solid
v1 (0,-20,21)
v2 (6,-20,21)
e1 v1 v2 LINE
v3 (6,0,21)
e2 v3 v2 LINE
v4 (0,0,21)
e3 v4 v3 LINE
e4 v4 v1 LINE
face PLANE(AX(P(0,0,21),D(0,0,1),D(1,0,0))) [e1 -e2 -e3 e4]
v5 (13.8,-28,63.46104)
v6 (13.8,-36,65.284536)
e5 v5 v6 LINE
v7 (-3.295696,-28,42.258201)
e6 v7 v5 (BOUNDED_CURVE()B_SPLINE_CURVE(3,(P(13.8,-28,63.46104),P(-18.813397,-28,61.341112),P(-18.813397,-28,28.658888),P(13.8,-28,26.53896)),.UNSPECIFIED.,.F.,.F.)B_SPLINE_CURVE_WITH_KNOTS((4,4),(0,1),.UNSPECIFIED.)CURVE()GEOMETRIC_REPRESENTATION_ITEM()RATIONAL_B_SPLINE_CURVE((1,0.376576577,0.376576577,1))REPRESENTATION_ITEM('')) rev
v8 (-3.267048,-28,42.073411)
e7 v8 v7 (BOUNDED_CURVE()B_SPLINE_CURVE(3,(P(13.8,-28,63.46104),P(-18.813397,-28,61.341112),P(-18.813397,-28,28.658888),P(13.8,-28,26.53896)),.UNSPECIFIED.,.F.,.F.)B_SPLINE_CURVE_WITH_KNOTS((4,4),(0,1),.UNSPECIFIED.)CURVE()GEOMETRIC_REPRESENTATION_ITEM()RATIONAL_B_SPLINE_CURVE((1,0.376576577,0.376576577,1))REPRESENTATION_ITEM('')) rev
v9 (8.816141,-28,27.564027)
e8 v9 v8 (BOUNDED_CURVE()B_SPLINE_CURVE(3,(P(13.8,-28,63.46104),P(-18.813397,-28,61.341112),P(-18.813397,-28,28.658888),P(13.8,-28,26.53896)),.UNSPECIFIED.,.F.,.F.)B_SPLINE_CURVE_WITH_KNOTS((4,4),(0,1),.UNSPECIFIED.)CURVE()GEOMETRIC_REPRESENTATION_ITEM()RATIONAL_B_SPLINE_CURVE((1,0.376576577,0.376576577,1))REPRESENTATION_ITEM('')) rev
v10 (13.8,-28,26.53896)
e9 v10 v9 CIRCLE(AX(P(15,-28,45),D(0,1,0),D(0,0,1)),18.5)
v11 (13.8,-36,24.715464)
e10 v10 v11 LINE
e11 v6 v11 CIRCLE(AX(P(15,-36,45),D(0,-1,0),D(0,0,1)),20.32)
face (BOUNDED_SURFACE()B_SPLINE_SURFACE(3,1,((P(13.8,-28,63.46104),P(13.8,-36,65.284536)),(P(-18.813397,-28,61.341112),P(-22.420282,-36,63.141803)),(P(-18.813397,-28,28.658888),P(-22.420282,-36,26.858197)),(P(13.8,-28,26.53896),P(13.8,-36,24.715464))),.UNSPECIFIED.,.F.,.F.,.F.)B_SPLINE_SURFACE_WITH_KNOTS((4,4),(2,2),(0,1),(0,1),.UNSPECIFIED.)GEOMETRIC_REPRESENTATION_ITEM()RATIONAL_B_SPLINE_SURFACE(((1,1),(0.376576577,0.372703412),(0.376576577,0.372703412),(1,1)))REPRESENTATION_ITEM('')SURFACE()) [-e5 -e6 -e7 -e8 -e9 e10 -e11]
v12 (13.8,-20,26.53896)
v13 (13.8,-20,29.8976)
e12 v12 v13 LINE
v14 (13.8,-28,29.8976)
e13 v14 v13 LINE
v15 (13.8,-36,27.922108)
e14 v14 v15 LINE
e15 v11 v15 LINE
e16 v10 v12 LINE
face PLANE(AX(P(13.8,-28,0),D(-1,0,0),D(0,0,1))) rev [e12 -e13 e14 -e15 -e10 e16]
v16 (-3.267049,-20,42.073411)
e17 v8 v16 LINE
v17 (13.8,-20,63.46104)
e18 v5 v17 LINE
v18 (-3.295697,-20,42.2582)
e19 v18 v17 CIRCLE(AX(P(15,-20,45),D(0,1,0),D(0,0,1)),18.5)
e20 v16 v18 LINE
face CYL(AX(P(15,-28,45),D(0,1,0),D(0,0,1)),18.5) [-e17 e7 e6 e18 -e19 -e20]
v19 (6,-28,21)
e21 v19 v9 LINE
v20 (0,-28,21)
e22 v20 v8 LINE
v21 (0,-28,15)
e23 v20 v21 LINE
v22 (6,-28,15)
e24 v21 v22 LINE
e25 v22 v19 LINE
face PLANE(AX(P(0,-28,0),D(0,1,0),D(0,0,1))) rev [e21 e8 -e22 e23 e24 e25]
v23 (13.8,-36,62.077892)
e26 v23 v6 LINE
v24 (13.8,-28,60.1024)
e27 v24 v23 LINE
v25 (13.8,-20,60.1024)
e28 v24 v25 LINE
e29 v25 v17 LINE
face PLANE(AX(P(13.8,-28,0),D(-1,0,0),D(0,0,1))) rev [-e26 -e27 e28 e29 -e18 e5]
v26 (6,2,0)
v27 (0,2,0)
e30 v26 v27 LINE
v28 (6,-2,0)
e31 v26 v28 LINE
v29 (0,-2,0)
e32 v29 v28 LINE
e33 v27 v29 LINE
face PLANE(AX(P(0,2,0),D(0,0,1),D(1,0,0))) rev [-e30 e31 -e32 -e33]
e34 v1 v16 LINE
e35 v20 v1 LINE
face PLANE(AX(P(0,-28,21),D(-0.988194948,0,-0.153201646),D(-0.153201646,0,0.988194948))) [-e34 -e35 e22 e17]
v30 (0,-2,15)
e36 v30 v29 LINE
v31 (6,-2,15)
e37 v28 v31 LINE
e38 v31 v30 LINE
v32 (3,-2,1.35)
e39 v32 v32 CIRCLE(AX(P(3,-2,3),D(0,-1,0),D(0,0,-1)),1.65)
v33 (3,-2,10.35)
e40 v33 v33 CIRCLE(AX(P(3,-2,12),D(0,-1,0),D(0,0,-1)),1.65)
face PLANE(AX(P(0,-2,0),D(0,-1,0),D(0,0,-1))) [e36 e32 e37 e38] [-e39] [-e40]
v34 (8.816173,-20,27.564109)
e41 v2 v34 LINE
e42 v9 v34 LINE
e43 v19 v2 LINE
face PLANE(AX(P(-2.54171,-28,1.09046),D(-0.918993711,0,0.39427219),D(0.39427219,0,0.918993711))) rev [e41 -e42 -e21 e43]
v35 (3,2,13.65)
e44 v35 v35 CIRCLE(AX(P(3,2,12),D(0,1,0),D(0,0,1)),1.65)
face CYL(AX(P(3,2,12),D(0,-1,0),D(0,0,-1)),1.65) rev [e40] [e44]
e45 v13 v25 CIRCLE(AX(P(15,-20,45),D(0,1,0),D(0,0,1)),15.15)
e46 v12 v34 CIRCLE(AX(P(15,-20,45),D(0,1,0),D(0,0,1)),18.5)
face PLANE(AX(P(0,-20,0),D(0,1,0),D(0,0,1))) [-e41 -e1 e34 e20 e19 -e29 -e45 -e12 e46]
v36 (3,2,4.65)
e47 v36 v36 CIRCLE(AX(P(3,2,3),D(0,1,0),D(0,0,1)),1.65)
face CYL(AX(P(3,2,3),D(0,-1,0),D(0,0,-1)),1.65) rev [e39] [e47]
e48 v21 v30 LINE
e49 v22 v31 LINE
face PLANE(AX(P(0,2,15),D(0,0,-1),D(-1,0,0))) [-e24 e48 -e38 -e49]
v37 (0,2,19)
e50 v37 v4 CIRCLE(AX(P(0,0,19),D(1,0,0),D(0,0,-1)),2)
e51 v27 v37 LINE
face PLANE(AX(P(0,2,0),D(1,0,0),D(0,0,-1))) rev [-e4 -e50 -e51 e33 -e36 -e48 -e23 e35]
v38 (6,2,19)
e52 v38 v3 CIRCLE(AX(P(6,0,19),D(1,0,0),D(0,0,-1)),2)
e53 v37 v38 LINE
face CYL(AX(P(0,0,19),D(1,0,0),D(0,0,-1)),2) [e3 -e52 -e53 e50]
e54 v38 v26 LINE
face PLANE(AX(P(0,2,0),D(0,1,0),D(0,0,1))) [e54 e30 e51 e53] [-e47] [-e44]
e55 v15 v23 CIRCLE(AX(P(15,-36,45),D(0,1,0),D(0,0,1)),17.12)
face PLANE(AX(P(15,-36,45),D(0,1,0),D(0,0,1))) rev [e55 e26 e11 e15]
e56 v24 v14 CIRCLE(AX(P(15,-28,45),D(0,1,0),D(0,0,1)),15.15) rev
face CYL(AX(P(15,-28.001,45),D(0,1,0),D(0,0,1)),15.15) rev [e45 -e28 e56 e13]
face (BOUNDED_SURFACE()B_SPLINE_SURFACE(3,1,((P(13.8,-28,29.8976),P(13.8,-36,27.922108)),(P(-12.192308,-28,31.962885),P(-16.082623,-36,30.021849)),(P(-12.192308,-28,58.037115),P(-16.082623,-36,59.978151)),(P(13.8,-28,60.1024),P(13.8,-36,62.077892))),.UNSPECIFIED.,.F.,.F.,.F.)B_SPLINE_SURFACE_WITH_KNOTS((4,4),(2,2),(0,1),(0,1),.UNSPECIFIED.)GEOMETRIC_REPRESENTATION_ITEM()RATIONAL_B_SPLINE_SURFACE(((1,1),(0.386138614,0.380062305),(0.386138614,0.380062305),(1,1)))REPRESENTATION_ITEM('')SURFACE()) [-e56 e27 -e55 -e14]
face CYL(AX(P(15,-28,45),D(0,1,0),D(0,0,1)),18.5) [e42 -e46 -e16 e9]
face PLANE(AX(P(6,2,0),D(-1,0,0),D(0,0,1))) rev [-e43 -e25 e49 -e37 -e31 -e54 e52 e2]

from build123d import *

# Parameters (mm, degrees)
SKETCH_1_W          = 6
SKETCH_1_H          = 15
SKETCH_1_R          = 1.65
EXTRUDE_1_DEPTH     = 2
EXTRUDE_2_DEPTH     = 6
SKETCH_3_W          = 6
SKETCH_3_H          = 30
EXTRUDE_3_DEPTH     = 8
EXTRUDE_4_DEPTH     = 8
CUT_EXTRUDE_1_REACH = 70.569
EXTRUDE_5_DEPTH     = 8
EXTRUDE_START       = 2
SKETCH_11_W         = 6
SKETCH_11_H         = 15
SKETCH_11_R         = 1.65
EXTRUDE_6_DEPTH     = 2


with BuildPart() as part:
    # 草图1 → 凸台-拉伸1 (new body)
    with BuildSketch(Plane(origin=(0, 0, 0), x_dir=(1, 0, 0), z_dir=(0, 1, 0))):
        with Locations((3, -7.5)):
            Rectangle(SKETCH_1_W, SKETCH_1_H)
        with Locations((3, -3)):
            Circle(SKETCH_1_R, mode=Mode.SUBTRACT)
        with Locations((3, -12)):
            Circle(SKETCH_1_R, mode=Mode.SUBTRACT)
    extrude(amount=EXTRUDE_1_DEPTH)

    # 草图2 → 凸台-拉伸2 (add)
    with BuildSketch(Plane(origin=(6, 0, 0), x_dir=(0, 0, -1), z_dir=(1, 0, 0))):
        with BuildLine():
            Line((-15, 2), (-19, 2))
            ThreePointArc((-19, 2), (-20.414213562, 1.414213562), (-21, 0))
            Line((-21, 0), (-21, -20))
            Line((-21, -20), (-15, -20))
            Line((-15, -20), (-15, 2))
        make_face()
    extrude(amount=-EXTRUDE_2_DEPTH)

    # 草图3 → 凸台-拉伸3 (add)
    with BuildSketch(Plane.XZ.offset(20)):
        with Locations((3, 30)):
            Rectangle(SKETCH_3_W, SKETCH_3_H)
    extrude(amount=EXTRUDE_3_DEPTH)

    # 草图5 → 凸台-拉伸4 (add)
    with BuildSketch(Plane(origin=(0, -20, 0), x_dir=(1, 0, 0), z_dir=(0, 1, 0))):
        with BuildLine():
            Line((13.8, -63.461040057), (13.8, -26.538959943))
            ThreePointArc((13.8, -26.538959943), (11.272674372, -26.879375186), (8.816173457, -27.564109163))
            Line((8.816173457, -27.564109163), (6, -21))
            Line((6, -21), (6, -28.836770125))
            ThreePointArc((6, -28.836770125), (-3.04771501, -49.065708168), (13.8, -63.461040057))
        make_face()
    extrude(amount=-EXTRUDE_4_DEPTH)

    # 草图7 → 切除-拉伸1 (cut, up to next)
    with BuildSketch(Plane(origin=(0, -20, 0), x_dir=(1, 0, 0), z_dir=(0, 1, 0)), mode=Mode.PRIVATE) as cut_extrude_1_sk1:
        with BuildLine():
            Line((13.8, -29.897599529), (13.8, -60.102400471))
            ThreePointArc((13.8, -60.102400471), (-0.15, -45), (13.8, -29.897599529))
        make_face()
    cut_extrude_1_tool1 = extrude(cut_extrude_1_sk1.sketch, amount=-CUT_EXTRUDE_1_REACH, mode=Mode.PRIVATE) & part.part
    add(cut_extrude_1_tool1.solids().sort_by_distance((7.916976, -20, 45))[0], mode=Mode.SUBTRACT)

    # 草图8 → 凸台-拉伸5 (add)
    with BuildSketch(Plane(origin=(0, -20, 0), x_dir=(1, 0, 0), z_dir=(0, 1, 0))):
        Polygon((0, -21), (-3.295697184, -42.258200487), (2.143402069, -32.702141854), align=None)
    extrude(amount=-EXTRUDE_5_DEPTH)

    # 草图10 for 放样1 → 放样1 section 0
    with BuildSketch(Plane.XZ.offset(28)):
        with BuildLine():
            Line((13.8, 63.461040057), (13.8, 60.102400471))
            # circular arc as an exact rational Bezier (weights 1, cos(half-angle), 1)
            Bezier((13.8, 60.102400471), (-176.26875, 45), (13.8, 29.897599529), weights=[1, 0.079207921, 1])
            Line((13.8, 29.897599529), (13.8, 26.538959943))
            Bezier((13.8, 26.538959943), (-270.208333333, 45), (13.8, 63.461040057), weights=[1, 0.064864865, 1])
        make_face()
    # 草图9 for 放样1 → 放样1 section 1
    with BuildSketch(Plane(origin=(0, -36, 0), x_dir=(-1, 0, 0), z_dir=(0, -1, 0))):
        with BuildLine():
            Line((-13.8, -24.715464018), (-13.8, -27.922107858))
            Bezier((-13.8, -27.922107858), (229.245333333, -45), (-13.8, -62.077892142), weights=[1, 0.070093458, 1])
            Line((-13.8, -62.077892142), (-13.8, -65.284535982))
            Bezier((-13.8, -65.284535982), (329.085333333, -45), (-13.8, -24.715464018), weights=[1, 0.059055118, 1])
        make_face()
    loft()

    # 草图11 → 凸台-拉伸6 (add)
    with BuildSketch(Plane.XZ.offset(EXTRUDE_START)):
        with Locations((3, 7.5)):
            Rectangle(SKETCH_11_W, SKETCH_11_H)
        with Locations((3, 12)):
            Circle(SKETCH_11_R, mode=Mode.SUBTRACT)
        with Locations((3, 3)):
            Circle(SKETCH_11_R, mode=Mode.SUBTRACT)
    extrude(amount=-EXTRUDE_6_DEPTH)


solid = part.part
